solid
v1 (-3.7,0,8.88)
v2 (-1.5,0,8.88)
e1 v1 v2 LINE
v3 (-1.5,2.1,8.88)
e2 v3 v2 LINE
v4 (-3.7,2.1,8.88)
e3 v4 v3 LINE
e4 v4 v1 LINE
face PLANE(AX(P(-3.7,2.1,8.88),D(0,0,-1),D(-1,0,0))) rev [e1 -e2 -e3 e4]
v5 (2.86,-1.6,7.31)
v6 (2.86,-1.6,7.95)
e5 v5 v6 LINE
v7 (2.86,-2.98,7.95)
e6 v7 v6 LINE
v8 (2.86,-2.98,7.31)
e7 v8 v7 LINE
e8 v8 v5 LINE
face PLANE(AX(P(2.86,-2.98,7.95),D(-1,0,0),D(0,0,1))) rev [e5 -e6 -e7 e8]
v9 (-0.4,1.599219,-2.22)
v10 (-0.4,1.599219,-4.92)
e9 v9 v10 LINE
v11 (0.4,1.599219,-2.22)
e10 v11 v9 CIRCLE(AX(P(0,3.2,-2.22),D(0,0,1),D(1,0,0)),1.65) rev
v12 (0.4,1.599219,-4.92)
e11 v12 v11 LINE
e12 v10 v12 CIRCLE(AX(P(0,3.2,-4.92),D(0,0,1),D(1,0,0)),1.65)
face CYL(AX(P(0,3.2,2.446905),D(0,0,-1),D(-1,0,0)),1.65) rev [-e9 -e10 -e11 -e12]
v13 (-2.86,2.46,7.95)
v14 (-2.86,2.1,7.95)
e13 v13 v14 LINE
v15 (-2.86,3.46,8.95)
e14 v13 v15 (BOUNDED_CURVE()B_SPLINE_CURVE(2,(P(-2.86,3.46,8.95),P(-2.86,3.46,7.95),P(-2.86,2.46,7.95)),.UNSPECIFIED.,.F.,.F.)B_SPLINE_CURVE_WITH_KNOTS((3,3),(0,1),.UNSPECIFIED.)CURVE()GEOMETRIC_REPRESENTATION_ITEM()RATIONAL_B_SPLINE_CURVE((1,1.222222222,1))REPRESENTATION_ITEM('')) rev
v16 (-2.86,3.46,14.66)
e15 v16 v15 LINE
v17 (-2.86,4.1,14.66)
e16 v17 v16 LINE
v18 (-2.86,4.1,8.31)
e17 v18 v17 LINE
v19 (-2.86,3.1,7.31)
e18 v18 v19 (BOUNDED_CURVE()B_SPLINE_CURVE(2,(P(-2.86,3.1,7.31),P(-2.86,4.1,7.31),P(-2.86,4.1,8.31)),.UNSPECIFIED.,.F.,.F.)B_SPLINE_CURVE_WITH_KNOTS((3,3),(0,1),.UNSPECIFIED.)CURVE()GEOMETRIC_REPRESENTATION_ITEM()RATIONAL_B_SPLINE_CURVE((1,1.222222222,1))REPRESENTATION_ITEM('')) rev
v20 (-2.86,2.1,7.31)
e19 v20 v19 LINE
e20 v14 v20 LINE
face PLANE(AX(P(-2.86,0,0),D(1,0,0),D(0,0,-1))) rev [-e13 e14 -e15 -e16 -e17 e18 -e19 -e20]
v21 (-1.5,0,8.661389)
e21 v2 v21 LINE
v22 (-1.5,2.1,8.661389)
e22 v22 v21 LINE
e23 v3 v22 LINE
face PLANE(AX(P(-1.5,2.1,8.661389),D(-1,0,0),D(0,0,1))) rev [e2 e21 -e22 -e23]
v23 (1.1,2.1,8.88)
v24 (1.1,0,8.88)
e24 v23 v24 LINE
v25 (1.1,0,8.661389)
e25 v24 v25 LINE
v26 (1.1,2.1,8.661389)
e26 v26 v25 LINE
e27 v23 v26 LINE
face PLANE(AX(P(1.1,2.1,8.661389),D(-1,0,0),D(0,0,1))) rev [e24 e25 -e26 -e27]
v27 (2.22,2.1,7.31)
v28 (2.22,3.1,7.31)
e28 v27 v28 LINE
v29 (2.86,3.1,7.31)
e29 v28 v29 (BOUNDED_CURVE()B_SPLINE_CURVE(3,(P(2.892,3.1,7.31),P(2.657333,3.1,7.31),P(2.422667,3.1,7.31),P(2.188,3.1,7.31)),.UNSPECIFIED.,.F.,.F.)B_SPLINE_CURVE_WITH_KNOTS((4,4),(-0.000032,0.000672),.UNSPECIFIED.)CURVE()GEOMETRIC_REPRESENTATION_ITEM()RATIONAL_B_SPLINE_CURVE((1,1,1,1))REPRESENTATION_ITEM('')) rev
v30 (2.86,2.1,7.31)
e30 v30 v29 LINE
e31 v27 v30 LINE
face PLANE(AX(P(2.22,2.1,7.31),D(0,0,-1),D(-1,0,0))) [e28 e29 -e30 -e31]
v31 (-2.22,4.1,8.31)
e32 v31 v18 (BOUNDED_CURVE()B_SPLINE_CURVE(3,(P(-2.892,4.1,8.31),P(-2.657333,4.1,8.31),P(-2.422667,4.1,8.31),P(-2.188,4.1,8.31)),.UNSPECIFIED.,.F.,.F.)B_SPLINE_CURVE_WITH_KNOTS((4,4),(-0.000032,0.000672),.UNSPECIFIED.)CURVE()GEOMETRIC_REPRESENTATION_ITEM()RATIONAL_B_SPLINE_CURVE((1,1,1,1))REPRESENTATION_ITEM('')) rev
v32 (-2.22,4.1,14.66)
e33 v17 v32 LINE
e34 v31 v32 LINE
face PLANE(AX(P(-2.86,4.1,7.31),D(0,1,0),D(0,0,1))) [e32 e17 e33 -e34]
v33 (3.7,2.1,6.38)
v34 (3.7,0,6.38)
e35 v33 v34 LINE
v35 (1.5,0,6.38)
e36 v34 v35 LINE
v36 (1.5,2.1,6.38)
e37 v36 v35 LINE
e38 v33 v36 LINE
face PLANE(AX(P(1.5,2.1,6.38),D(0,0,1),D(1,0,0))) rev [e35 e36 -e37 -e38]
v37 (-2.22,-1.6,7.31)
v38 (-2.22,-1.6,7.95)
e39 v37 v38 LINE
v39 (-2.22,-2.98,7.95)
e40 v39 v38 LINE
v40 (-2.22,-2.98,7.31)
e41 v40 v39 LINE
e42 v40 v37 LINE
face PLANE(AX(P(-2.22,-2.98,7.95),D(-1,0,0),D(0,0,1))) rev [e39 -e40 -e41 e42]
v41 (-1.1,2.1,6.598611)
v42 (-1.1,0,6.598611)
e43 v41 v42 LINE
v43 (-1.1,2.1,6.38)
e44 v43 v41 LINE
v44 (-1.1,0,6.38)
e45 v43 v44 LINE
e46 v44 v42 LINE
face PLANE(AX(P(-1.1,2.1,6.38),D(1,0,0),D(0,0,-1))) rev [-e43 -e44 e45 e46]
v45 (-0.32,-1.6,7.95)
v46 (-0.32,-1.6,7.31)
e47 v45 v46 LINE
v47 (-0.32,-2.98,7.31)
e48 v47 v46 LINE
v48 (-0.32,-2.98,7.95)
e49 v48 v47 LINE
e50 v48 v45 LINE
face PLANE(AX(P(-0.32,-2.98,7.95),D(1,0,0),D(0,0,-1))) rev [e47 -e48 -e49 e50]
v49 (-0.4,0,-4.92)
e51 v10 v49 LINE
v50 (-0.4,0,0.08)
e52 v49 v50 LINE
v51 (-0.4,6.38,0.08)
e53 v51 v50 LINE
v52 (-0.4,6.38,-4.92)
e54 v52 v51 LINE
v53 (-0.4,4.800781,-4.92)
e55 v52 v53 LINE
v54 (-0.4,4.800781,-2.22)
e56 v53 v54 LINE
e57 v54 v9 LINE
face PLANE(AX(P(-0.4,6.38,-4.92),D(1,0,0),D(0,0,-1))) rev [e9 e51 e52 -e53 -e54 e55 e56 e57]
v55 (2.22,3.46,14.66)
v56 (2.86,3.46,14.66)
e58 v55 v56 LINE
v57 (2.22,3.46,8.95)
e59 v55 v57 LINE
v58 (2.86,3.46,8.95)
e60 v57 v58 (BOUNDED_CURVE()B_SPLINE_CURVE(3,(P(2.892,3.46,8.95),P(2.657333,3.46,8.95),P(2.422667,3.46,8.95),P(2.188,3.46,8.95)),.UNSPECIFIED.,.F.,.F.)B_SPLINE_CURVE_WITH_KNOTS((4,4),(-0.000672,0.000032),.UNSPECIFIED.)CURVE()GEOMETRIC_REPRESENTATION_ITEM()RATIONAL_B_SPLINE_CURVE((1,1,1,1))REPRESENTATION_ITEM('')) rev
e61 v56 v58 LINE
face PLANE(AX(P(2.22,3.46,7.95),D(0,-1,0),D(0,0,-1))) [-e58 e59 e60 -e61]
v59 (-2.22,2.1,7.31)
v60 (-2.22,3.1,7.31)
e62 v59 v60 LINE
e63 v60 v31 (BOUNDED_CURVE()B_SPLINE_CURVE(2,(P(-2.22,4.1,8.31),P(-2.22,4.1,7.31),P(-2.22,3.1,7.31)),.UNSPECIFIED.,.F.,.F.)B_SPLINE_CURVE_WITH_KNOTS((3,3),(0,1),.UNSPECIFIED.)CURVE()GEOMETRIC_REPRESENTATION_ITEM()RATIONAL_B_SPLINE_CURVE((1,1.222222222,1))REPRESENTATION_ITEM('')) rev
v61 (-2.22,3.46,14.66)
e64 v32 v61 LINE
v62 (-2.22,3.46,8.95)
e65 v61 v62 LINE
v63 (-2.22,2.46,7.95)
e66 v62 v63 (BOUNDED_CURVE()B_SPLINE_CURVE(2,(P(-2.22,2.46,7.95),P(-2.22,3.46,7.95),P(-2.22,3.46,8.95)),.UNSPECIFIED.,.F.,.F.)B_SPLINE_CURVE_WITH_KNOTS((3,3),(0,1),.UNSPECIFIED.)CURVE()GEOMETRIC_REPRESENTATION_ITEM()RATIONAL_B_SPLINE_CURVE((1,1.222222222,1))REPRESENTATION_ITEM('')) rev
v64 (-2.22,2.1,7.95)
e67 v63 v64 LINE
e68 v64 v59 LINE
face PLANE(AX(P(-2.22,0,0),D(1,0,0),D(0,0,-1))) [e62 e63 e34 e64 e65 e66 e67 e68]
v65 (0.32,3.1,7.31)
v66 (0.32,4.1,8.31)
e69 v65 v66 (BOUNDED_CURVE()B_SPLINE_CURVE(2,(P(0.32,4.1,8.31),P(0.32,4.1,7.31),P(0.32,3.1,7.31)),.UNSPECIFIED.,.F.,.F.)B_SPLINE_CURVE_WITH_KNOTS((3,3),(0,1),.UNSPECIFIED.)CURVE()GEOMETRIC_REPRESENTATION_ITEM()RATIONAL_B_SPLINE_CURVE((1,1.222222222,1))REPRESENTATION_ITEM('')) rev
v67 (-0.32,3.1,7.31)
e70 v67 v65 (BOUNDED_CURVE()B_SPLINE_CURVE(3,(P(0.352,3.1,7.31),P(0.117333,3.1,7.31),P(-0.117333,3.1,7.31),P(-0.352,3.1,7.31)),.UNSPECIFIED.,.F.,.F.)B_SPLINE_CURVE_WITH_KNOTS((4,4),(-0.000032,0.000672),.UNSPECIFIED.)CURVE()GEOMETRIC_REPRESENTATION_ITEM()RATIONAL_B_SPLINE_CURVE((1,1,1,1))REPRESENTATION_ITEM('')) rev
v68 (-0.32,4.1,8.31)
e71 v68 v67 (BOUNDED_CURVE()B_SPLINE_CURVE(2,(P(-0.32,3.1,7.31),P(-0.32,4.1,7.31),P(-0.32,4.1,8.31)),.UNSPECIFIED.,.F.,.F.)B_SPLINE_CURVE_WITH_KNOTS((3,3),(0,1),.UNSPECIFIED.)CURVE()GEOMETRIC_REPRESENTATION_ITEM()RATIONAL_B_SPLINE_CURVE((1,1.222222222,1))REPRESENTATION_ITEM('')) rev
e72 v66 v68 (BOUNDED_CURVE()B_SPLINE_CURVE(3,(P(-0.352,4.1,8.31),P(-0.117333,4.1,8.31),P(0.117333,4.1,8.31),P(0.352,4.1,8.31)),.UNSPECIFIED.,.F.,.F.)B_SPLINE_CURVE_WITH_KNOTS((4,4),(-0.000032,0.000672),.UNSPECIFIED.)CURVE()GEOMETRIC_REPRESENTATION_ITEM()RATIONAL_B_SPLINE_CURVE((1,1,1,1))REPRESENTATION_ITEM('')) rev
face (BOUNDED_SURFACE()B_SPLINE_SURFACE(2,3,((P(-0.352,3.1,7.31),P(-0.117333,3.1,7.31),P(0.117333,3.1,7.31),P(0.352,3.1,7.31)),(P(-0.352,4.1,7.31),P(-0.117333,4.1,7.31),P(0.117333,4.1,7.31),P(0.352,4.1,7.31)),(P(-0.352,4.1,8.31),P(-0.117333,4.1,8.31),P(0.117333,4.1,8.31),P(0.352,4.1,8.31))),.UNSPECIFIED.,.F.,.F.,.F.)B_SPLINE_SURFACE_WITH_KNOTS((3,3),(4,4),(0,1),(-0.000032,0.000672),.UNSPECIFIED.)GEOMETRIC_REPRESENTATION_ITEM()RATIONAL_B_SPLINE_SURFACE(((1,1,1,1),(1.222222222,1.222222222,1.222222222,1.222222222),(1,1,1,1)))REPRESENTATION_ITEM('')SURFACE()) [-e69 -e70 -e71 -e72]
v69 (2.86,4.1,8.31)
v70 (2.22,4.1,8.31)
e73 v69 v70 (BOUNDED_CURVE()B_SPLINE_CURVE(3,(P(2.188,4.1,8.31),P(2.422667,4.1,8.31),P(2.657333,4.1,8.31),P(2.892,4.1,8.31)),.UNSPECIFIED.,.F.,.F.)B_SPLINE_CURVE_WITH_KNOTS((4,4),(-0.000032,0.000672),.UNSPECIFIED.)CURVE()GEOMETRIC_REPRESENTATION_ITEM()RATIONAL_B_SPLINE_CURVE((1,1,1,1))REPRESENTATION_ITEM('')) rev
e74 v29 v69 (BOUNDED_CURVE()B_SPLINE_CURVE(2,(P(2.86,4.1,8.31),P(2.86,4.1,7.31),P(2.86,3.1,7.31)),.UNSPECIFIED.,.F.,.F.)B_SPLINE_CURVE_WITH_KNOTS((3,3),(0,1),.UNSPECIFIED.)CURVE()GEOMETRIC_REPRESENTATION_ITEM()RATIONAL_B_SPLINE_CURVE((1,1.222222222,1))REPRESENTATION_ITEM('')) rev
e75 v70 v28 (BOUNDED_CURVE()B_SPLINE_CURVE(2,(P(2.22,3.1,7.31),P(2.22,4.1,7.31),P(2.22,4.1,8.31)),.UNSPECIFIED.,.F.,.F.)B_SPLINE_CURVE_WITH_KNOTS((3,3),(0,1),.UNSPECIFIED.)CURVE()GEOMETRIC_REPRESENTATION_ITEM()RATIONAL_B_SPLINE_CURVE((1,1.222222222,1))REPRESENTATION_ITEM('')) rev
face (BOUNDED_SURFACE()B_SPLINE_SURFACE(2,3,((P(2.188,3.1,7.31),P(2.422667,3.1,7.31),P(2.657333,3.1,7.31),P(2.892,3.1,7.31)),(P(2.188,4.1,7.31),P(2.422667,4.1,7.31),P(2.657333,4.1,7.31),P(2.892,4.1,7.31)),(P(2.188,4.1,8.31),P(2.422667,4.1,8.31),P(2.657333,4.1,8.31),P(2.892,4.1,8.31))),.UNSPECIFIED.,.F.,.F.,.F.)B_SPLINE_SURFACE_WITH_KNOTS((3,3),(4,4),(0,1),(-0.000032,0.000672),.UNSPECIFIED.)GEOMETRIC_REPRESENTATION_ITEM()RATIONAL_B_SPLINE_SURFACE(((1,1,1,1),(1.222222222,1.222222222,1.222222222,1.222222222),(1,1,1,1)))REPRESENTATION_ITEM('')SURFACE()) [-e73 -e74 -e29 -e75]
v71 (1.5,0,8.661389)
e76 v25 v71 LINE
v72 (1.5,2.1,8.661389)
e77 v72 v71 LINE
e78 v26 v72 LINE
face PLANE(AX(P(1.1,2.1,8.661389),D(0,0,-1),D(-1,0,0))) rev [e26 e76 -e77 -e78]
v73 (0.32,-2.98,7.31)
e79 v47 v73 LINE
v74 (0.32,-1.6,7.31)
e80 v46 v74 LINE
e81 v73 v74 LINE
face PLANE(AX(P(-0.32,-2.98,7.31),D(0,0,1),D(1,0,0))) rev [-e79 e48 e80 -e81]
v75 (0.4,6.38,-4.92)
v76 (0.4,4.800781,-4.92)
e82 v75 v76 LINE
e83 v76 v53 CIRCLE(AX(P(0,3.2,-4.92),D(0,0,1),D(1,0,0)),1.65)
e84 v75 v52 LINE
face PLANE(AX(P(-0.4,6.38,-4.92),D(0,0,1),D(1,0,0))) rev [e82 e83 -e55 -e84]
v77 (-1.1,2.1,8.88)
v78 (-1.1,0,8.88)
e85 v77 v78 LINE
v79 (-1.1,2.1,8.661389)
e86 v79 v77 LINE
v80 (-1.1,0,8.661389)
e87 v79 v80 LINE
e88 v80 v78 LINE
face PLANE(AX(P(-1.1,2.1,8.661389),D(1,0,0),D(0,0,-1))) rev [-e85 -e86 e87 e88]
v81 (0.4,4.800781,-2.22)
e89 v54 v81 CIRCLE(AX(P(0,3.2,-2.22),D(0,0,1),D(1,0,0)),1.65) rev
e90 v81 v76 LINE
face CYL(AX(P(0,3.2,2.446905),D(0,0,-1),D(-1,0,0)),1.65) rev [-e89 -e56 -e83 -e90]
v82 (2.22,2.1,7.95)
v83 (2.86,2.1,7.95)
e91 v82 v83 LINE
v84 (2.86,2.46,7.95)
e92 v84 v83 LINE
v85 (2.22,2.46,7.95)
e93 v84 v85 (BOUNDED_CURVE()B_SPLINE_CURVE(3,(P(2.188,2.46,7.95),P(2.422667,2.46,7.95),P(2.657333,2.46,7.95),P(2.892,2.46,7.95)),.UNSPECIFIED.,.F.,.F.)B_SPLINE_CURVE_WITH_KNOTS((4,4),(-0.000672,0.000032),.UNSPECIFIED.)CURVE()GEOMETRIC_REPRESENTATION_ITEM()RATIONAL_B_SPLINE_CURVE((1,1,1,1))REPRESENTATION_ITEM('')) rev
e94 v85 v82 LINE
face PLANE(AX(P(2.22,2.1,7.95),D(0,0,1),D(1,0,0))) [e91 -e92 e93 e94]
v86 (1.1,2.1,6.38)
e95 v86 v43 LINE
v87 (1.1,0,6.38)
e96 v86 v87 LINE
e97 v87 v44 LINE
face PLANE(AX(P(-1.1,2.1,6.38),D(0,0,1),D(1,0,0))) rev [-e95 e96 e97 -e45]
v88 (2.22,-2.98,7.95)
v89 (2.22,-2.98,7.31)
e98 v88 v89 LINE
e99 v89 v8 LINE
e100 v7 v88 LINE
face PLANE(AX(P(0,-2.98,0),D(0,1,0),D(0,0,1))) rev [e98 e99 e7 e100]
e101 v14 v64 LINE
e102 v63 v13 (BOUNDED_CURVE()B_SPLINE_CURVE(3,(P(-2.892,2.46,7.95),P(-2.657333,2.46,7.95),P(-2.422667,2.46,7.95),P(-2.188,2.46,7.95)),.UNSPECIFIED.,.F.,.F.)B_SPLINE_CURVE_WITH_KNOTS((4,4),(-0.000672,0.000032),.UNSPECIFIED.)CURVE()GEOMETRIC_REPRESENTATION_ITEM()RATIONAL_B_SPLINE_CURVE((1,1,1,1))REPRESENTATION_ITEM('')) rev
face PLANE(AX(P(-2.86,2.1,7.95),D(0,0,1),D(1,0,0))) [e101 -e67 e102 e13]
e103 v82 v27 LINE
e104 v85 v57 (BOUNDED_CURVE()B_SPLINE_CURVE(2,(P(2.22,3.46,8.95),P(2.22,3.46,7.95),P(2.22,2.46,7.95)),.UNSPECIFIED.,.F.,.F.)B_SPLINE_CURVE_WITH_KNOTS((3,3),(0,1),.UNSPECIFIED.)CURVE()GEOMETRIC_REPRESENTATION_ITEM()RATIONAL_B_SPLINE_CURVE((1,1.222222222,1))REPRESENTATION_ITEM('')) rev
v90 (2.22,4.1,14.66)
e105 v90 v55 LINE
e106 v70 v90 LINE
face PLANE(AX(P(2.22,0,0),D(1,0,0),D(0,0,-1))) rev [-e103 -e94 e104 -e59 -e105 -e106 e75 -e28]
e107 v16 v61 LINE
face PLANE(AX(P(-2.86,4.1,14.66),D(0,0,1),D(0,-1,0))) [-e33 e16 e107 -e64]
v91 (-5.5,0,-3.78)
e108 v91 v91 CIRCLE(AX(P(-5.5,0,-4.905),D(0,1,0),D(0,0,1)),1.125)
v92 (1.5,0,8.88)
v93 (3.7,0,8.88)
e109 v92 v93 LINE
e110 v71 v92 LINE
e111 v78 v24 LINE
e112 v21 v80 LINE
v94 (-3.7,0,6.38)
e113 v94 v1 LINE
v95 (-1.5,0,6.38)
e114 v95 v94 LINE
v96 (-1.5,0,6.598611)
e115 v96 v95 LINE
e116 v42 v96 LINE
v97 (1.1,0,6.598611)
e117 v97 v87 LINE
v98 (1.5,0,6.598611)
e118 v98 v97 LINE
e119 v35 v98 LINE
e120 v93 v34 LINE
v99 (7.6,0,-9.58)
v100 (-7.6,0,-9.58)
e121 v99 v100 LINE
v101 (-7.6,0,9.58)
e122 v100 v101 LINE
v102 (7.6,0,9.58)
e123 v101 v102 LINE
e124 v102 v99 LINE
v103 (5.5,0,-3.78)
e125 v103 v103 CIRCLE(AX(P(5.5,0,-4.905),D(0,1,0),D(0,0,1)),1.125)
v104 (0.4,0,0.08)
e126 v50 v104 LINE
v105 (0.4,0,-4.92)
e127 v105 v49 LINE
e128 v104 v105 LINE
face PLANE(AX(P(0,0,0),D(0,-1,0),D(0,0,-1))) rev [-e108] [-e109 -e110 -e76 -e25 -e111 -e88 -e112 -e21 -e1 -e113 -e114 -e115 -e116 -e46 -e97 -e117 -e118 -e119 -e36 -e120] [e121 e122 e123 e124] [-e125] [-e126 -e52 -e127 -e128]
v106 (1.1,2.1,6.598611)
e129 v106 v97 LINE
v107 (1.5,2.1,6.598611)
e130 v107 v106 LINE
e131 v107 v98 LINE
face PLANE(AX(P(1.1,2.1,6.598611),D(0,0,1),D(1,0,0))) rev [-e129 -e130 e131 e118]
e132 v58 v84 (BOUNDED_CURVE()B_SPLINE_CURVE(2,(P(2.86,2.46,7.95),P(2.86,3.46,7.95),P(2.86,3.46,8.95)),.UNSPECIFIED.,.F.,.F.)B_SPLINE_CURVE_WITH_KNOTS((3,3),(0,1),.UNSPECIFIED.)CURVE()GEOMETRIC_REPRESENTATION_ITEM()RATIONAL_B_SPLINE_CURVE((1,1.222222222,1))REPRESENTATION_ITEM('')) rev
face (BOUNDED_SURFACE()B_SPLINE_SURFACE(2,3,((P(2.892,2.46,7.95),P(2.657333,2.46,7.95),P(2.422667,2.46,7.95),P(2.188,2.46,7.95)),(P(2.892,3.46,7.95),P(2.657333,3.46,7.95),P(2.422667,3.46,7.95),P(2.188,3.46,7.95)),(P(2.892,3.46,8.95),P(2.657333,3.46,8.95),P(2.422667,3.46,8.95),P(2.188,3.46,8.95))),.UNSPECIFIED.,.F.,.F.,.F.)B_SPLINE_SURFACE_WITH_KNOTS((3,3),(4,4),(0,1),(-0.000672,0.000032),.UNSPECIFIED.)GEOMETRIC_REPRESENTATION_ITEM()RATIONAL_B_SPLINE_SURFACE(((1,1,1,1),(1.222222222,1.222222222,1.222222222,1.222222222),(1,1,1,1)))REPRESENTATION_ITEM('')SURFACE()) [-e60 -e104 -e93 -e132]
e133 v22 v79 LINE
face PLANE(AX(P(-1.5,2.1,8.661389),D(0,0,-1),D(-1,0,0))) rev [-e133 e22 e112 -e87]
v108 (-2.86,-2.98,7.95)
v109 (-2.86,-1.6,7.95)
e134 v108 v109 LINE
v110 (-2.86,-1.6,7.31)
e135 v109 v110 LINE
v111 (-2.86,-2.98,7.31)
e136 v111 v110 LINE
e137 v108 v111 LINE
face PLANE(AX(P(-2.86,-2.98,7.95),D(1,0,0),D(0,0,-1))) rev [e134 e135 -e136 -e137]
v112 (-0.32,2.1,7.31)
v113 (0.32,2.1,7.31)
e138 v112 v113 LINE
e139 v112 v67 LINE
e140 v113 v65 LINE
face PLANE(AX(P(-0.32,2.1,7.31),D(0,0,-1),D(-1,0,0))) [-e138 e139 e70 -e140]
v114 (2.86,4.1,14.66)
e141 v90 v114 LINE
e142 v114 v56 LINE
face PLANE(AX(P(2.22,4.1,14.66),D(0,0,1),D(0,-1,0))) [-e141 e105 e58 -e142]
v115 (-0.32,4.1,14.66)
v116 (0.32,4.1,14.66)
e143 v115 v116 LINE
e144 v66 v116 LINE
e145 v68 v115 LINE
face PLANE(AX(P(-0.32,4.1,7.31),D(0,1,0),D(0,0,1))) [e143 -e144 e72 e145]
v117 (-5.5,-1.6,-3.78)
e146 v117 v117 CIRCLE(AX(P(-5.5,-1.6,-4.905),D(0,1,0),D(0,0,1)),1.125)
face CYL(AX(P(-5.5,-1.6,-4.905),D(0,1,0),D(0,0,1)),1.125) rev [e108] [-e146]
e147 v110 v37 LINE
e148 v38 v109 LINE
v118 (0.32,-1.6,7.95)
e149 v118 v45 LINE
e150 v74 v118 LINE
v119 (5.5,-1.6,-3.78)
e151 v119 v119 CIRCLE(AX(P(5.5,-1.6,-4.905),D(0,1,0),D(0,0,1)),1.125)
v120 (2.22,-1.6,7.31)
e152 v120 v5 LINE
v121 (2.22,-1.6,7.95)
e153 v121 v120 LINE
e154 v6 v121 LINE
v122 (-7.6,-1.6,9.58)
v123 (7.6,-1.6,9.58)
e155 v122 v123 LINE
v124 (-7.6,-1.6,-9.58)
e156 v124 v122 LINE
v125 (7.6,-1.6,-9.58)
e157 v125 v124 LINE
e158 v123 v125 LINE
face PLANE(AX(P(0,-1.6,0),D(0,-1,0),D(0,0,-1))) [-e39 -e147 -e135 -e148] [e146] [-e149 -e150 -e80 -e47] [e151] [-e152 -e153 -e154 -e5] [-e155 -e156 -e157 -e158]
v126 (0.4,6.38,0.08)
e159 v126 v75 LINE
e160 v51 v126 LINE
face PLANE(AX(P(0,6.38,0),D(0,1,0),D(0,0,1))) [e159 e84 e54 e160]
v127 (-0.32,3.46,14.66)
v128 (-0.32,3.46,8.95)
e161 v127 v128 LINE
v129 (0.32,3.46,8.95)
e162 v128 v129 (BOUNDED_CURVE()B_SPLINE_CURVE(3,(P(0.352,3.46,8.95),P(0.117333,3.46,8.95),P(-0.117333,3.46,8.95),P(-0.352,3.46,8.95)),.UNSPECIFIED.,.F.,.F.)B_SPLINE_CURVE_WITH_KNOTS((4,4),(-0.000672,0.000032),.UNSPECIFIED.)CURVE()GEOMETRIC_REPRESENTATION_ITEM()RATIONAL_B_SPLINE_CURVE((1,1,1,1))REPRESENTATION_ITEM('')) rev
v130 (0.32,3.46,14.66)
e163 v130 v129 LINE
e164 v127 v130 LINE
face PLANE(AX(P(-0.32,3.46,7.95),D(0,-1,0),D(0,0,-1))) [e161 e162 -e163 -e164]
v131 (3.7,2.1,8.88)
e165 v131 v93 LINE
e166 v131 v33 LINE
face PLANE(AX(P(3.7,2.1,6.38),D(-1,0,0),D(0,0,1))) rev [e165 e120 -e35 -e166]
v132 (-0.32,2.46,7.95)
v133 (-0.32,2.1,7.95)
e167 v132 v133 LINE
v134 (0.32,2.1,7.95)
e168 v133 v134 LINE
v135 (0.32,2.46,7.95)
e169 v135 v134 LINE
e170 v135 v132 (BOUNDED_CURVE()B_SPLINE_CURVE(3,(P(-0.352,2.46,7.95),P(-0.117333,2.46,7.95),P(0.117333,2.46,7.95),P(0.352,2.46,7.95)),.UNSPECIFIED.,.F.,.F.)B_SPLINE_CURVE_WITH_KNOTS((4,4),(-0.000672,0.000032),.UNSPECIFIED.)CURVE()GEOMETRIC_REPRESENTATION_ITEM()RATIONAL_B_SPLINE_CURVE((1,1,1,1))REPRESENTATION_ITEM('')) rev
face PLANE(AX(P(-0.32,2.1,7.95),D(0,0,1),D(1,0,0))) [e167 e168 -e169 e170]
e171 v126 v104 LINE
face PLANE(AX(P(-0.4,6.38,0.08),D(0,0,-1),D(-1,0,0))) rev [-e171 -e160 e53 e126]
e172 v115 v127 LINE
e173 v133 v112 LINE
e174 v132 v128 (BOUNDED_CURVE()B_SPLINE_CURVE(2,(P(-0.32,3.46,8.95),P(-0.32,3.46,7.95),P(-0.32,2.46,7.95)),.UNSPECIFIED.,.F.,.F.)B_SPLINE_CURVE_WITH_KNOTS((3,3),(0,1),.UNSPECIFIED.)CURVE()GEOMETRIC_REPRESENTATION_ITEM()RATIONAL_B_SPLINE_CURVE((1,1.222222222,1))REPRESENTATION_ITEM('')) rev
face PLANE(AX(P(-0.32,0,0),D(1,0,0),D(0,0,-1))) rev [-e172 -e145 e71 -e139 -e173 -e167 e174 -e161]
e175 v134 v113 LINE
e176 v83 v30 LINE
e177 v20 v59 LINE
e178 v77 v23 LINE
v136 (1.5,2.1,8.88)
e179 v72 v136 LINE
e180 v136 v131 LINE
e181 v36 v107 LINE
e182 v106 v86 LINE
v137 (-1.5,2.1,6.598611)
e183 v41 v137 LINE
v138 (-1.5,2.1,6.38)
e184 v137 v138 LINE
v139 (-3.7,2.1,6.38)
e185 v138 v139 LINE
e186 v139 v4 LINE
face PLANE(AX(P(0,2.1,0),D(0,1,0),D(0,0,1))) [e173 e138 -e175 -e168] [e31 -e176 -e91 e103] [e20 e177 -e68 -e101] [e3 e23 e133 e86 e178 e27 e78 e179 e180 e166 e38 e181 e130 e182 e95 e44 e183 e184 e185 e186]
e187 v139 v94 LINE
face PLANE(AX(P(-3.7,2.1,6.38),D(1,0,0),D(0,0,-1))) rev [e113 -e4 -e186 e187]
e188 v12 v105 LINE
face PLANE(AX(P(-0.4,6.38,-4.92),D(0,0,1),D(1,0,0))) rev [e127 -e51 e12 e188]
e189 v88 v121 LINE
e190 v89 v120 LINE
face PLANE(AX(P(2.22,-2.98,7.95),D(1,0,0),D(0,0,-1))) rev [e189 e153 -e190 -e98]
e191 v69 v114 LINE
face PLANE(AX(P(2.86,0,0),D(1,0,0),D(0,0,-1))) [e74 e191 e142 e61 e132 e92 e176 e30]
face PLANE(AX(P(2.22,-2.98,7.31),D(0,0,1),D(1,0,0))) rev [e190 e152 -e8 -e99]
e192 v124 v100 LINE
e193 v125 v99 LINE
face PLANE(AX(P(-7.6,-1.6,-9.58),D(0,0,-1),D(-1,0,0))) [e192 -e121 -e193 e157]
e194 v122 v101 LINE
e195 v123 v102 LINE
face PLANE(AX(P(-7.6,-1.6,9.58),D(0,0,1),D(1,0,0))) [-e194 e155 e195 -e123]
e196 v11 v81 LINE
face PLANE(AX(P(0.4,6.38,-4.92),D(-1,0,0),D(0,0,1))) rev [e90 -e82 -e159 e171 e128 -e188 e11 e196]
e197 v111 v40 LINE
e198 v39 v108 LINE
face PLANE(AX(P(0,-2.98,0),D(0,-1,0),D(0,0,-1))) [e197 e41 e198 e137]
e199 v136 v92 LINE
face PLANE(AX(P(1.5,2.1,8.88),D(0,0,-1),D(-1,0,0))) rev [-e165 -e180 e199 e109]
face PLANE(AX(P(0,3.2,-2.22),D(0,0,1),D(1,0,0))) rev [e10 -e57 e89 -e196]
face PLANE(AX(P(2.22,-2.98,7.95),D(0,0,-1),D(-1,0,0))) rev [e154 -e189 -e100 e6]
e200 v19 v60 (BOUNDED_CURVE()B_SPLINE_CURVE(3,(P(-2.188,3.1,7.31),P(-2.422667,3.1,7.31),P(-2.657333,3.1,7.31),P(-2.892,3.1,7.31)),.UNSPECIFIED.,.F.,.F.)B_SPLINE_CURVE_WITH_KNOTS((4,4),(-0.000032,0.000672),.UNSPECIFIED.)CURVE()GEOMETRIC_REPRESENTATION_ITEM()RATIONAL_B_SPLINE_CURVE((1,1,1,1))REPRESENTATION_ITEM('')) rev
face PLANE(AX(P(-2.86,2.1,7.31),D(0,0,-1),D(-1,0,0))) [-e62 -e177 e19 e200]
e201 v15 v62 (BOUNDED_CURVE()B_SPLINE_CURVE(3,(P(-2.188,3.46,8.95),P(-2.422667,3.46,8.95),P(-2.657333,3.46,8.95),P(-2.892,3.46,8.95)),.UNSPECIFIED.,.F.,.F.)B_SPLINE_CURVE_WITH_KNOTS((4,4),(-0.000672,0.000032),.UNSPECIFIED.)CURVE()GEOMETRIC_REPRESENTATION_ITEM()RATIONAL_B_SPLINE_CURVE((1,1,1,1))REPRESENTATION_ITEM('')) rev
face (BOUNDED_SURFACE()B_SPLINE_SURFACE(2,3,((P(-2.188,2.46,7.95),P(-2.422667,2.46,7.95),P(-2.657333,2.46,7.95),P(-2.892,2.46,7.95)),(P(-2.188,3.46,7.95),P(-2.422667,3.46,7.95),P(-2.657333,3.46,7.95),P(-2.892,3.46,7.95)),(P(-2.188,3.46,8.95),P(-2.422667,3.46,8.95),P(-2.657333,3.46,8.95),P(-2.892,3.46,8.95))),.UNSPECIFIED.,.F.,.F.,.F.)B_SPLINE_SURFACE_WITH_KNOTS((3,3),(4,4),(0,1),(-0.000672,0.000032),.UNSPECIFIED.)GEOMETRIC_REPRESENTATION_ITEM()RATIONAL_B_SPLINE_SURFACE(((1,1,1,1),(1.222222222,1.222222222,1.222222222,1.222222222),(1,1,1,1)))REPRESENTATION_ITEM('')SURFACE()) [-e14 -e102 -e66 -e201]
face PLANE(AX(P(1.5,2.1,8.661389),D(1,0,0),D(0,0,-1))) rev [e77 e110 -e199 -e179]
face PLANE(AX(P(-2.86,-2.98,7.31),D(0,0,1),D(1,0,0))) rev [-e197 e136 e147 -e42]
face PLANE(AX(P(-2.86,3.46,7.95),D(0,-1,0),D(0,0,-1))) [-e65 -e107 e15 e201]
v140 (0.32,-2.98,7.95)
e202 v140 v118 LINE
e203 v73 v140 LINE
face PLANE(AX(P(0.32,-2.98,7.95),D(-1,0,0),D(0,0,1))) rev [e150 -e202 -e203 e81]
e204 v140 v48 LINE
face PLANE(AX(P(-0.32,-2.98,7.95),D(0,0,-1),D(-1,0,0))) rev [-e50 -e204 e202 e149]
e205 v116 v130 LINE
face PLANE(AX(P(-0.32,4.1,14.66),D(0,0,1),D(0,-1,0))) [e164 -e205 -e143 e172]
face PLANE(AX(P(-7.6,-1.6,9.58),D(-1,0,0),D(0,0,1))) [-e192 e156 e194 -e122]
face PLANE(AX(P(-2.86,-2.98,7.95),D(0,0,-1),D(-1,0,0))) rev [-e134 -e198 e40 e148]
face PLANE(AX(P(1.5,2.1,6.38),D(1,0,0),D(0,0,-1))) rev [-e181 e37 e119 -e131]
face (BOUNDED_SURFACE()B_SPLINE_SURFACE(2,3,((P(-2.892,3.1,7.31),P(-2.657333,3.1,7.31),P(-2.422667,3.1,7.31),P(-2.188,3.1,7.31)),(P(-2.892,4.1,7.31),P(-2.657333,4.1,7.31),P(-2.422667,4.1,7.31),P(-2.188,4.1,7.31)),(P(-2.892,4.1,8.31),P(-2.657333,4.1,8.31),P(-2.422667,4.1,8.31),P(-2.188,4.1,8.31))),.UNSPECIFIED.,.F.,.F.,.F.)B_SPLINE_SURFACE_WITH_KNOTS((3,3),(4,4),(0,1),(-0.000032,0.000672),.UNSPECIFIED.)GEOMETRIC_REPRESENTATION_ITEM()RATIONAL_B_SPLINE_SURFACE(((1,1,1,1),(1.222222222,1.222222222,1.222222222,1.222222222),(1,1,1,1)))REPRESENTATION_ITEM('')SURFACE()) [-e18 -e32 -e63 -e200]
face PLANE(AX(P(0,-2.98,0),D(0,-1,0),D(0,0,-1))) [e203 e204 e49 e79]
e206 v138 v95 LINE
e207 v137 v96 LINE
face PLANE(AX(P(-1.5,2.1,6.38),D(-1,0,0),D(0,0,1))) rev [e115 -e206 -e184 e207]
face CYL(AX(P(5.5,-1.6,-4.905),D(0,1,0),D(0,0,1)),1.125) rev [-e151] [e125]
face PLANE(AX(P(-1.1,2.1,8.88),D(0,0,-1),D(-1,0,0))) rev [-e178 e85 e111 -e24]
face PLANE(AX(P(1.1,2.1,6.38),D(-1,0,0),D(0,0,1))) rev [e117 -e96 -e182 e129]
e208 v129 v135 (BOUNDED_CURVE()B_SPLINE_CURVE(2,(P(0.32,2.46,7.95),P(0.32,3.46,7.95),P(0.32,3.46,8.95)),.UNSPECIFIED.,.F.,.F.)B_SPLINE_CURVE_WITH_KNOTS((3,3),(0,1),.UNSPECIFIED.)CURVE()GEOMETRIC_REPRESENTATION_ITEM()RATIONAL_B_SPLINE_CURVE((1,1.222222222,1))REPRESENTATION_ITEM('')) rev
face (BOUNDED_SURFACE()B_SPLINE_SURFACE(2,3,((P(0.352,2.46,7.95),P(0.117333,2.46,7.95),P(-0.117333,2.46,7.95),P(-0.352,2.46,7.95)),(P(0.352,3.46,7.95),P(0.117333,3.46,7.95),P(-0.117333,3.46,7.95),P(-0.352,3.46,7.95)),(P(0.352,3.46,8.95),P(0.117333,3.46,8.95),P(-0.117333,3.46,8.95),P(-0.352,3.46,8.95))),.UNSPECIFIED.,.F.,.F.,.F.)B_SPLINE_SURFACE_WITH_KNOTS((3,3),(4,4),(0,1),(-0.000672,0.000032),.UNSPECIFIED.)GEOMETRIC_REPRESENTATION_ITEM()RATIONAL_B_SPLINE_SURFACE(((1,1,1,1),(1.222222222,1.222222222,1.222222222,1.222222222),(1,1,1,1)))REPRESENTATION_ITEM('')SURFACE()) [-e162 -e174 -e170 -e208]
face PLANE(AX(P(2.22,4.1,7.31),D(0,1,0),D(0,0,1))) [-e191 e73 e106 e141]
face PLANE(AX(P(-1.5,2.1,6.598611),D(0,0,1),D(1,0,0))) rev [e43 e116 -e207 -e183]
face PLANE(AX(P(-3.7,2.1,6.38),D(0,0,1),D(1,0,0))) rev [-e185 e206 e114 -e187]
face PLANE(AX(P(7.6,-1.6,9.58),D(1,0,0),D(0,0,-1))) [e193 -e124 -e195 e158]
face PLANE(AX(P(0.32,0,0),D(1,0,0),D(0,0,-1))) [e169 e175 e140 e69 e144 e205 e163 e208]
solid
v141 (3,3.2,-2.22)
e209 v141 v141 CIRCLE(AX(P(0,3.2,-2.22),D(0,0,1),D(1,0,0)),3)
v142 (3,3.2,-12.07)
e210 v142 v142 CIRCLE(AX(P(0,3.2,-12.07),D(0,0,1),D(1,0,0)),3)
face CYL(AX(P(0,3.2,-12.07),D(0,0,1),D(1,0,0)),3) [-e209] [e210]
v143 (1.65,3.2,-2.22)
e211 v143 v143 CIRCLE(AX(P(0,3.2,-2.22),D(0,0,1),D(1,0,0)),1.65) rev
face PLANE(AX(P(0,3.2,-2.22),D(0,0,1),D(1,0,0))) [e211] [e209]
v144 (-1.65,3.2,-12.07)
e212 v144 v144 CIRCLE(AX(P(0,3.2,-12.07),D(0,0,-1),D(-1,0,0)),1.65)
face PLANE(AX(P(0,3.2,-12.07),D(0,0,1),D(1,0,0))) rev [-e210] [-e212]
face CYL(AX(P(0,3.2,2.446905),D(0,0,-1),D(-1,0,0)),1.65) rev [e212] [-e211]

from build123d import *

# Parameters (mm, degrees)
SKETCH1_W                     = 15.2
SKETCH1_H                     = 19.16
BOSS_EXTRUDE1_DEPTH           = 1.6
SKETCH2_R                     = 1.125
CUT_EXTRUDE1_DEPTH            = 13.332736923
BOSS_EXTRUDE2_DEPTH           = 2.1
BOSS_EXTRUDE3_DEPTH           = 0.32
FILLET1_SIZE                  = 1
LPATTERN1_COUNT               = 2
LPATTERN1_PITCH               = 2.54
FILLET1_OF_LPATTERN1_SIZE     = 1
LPATTERN1_COL_COUNT           = 2
LPATTERN1_COL_PITCH           = 2.54
FILLET1_OF_LPATTERN1_COL_SIZE = 1
SKETCH5_W                     = 0.8
SKETCH5_H                     = 5
BOSS_EXTRUDE4_DEPTH           = 6.38
SKETCH6_R                     = 3
BOSS_EXTRUDE7_DEPTH           = 9.85
SKETCH8_R                     = 1.65
CUT_EXTRUDE2_DEPTH            = 9.85
SKETCH9_W                     = 0.64
SKETCH9_H                     = 0.64
BOSS_EXTRUDE11_DEPTH          = 1.38


with BuildPart() as part:
    # Sketch1 → Boss-Extrude1 (new body)
    with BuildSketch(Plane(origin=(0, 0, 0), x_dir=(1, 0, 0), z_dir=(0, 1, 0))):
        Rectangle(SKETCH1_W, SKETCH1_H)
    extrude(amount=-BOSS_EXTRUDE1_DEPTH)

    # Sketch2 → Cut-Extrude1 (cut, through all)
    with BuildSketch(Plane(origin=(0, 0, 0), x_dir=(1, 0, 0), z_dir=(0, 1, 0))):
        with Locations(Location((-5.5, 4.905, 0), (0, 0, 270))):
            Circle(SKETCH2_R)
        with Locations(Location((5.5, 4.905, 0), (0, 0, 270))):
            Circle(SKETCH2_R)
    extrude(amount=-CUT_EXTRUDE1_DEPTH, mode=Mode.SUBTRACT)

    # Sketch3 → Boss-Extrude2 (add)
    with BuildSketch(Plane(origin=(0, 0, 0), x_dir=(1, 0, 0), z_dir=(0, 1, 0))):
        Polygon((-3.7, -6.38), (-1.5, -6.38), (-1.5, -6.598611303), (-1.1, -6.598611303), (-1.1, -6.38), (1.1, -6.38), (1.1, -6.598611303), (1.5, -6.598611303), (1.5, -6.38), (3.7, -6.38), (3.7, -8.88), (1.5, -8.88), (1.5, -8.661388697), (1.1, -8.661388697), (1.1, -8.88), (-1.1, -8.88), (-1.1, -8.661388697), (-1.5, -8.661388697), (-1.5, -8.88), (-3.7, -8.88), align=None)
    extrude(amount=BOSS_EXTRUDE2_DEPTH)

    # Sketch4 → Boss-Extrude3 (add, symmetric)
    with BuildSketch(Plane(origin=(0, 0, 0), x_dir=(0, 0, -1), z_dir=(1, 0, 0))):
        Polygon((-7.95, 2.1), (-7.31, 2.1), (-7.31, 4.1), (-14.66, 4.1), (-14.66, 3.46), (-7.95, 3.46), align=None)
    boss_extrude3 = extrude(amount=BOSS_EXTRUDE3_DEPTH, both=True)

    # Fillet1
    # a fillet whose section is not a circle: 1 mm, written as the material it adds along each edge
    with BuildSketch(Plane(origin=(0.32, 3.46, 7.95), x_dir=(0, -1, 0), z_dir=(-1, 0, 0))) as fillet1_piece_1:
        with BuildLine():
            Bezier((FILLET1_SIZE, 0), (0, 0), (0, FILLET1_SIZE), weights=[1, 1.222222222, 1])
            Line((0, FILLET1_SIZE), (0, 0))
            Line((0, 0), (FILLET1_SIZE, 0))
        make_face()
    extrude(amount=0.64)
    # a fillet whose section is not a circle: 1 mm, written as the material it takes off along each edge
    with BuildSketch(Plane(origin=(-2.82, 4.1, 7.31), x_dir=(0, -1, 0), z_dir=(1, 0, 0))) as fillet1_2_piece_1:
        with BuildLine():
            Bezier((FILLET1_SIZE, 0), (0, 0), (0, -FILLET1_SIZE), weights=[1, 1.222222222, 1])
            Line((0, -FILLET1_SIZE), (0, 0))
            Line((0, 0), (FILLET1_SIZE, 0))
        make_face()
    extrude(amount=5.64, mode=Mode.SUBTRACT)

    # LPattern1: Boss-Extrude3 ×2
    with Locations(*[(i * LPATTERN1_PITCH, 0, 0) for i in range(1, LPATTERN1_COUNT)]):
        add(boss_extrude3)

    # Fillet1 of LPattern1
    # a fillet whose section is not a circle: 1 mm, written as the material it adds along each edge
    with BuildSketch(Plane(origin=(2.86, 3.46, 7.95), x_dir=(0, -1, 0), z_dir=(-1, 0, 0))) as fillet1_of_lpattern1_piece_1:
        with BuildLine():
            Bezier((FILLET1_OF_LPATTERN1_SIZE, 0), (0, 0), (0, FILLET1_OF_LPATTERN1_SIZE), weights=[1, 1.222222222, 1])
            Line((0, FILLET1_OF_LPATTERN1_SIZE), (0, 0))
            Line((0, 0), (FILLET1_OF_LPATTERN1_SIZE, 0))
        make_face()
    extrude(amount=0.64)
    with BuildSketch(Plane(origin=(2.86, 3.46, 7.95), x_dir=(0, -1, 0), z_dir=(-1, 0, 0))) as fillet1_of_lpattern1_piece_2_section:
        with BuildLine():
            Bezier((FILLET1_OF_LPATTERN1_SIZE, 0), (0, 0), (0, FILLET1_OF_LPATTERN1_SIZE), weights=[1, 1.222222222, 1])
            Line((0, FILLET1_OF_LPATTERN1_SIZE), (0, 0))
            Line((0, 0), (FILLET1_OF_LPATTERN1_SIZE, 0))
        make_face()
    fillet1_of_lpattern1_piece_2 = extrude(amount=3.14, mode=Mode.PRIVATE)
    fillet1_of_lpattern1_piece_2 = split(fillet1_of_lpattern1_piece_2, bisect_by=Plane(origin=(0.32, 3.46, 7.95), z_dir=(-1, 0, 0)), keep=Keep.TOP, mode=Mode.PRIVATE)
    add(fillet1_of_lpattern1_piece_2)
    # a fillet whose section is not a circle: 1 mm, written as the material it takes off along each edge
    with BuildSketch(Plane(origin=(-0.28, 4.1, 7.31), x_dir=(0, -1, 0), z_dir=(1, 0, 0))) as fillet1_of_lpattern1_2_piece_1:
        with BuildLine():
            Bezier((FILLET1_OF_LPATTERN1_SIZE, 0), (0, 0), (0, -FILLET1_OF_LPATTERN1_SIZE), weights=[1, 1.222222222, 1])
            Line((0, -FILLET1_OF_LPATTERN1_SIZE), (0, 0))
            Line((0, 0), (FILLET1_OF_LPATTERN1_SIZE, 0))
        make_face()
    extrude(amount=5.64, mode=Mode.SUBTRACT)

    # LPattern1 col: Boss-Extrude3 ×2
    with Locations(*[(-i * LPATTERN1_COL_PITCH, 0, 0) for i in range(1, LPATTERN1_COL_COUNT)]):
        add(boss_extrude3)

    # Fillet1 of LPattern1 col
    # a fillet whose section is not a circle: 1 mm, written as the material it adds along each edge
    with BuildSketch(Plane(origin=(0.28, 3.46, 7.95), x_dir=(0, -1, 0), z_dir=(-1, 0, 0))) as fillet1_of_lpattern1_col_piece_1_section:
        with BuildLine():
            Bezier((FILLET1_OF_LPATTERN1_COL_SIZE, 0), (0, 0), (0, FILLET1_OF_LPATTERN1_COL_SIZE), weights=[1, 1.222222222, 1])
            Line((0, FILLET1_OF_LPATTERN1_COL_SIZE), (0, 0))
            Line((0, 0), (FILLET1_OF_LPATTERN1_COL_SIZE, 0))
        make_face()
    fillet1_of_lpattern1_col_piece_1 = extrude(amount=3.14, mode=Mode.PRIVATE)
    fillet1_of_lpattern1_col_piece_1 = split(fillet1_of_lpattern1_col_piece_1, bisect_by=Plane(origin=(-0.32, 3.46, 7.95), z_dir=(1, 0, 0)), keep=Keep.TOP, mode=Mode.PRIVATE)
    add(fillet1_of_lpattern1_col_piece_1)
    with BuildSketch(Plane(origin=(-2.22, 3.46, 7.95), x_dir=(0, -1, 0), z_dir=(-1, 0, 0))) as fillet1_of_lpattern1_col_piece_2:
        with BuildLine():
            Bezier((FILLET1_OF_LPATTERN1_COL_SIZE, 0), (0, 0), (0, FILLET1_OF_LPATTERN1_COL_SIZE), weights=[1, 1.222222222, 1])
            Line((0, FILLET1_OF_LPATTERN1_COL_SIZE), (0, 0))
            Line((0, 0), (FILLET1_OF_LPATTERN1_COL_SIZE, 0))
        make_face()
    extrude(amount=0.64)
    # a fillet whose section is not a circle: 1 mm, written as the material it takes off along each edge
    with BuildSketch(Plane(origin=(-5.36, 4.1, 7.31), x_dir=(0, -1, 0), z_dir=(1, 0, 0))) as fillet1_of_lpattern1_col_2_piece_1:
        with BuildLine():
            Bezier((FILLET1_OF_LPATTERN1_COL_SIZE, 0), (0, 0), (0, -FILLET1_OF_LPATTERN1_COL_SIZE), weights=[1, 1.222222222, 1])
            Line((0, -FILLET1_OF_LPATTERN1_COL_SIZE), (0, 0))
            Line((0, 0), (FILLET1_OF_LPATTERN1_COL_SIZE, 0))
        make_face()
    extrude(amount=5.64, mode=Mode.SUBTRACT)

    # Sketch5 → Boss-Extrude4 (add)
    with BuildSketch(Plane(origin=(0, 0, 0), x_dir=(1, 0, 0), z_dir=(0, 1, 0))):
        with Locations((0, 2.42)):
            Rectangle(SKETCH5_W, SKETCH5_H)
    extrude(amount=BOSS_EXTRUDE4_DEPTH)


with BuildPart() as body_2:
    # Sketch6 → Boss-Extrude7 (new body)
    with BuildSketch(Plane.XY.offset(-2.22)):
        with Locations((0, 3.2)):
            Circle(SKETCH6_R)
    extrude(amount=-BOSS_EXTRUDE7_DEPTH)


with BuildPart() as cut_extrude2_tool:
    # Sketch8 → Cut-Extrude2 (new body)
    with BuildSketch(Plane(origin=(0, 0, -12.07), x_dir=(-1, 0, 0), z_dir=(0, 0, -1))):
        with Locations((0, 3.2)):
            Circle(SKETCH8_R)
    extrude(amount=-CUT_EXTRUDE2_DEPTH)


with BuildPart() as part_1:
    add(part.part)

    # Cut-Extrude2: cut by cut_extrude2_tool
    add(cut_extrude2_tool.part, mode=Mode.SUBTRACT)

    # Sketch9 → Boss-Extrude11 (add)
    with BuildSketch(Plane.XZ.offset(1.6)):
        with Locations((2.54, 7.63)):
            Rectangle(SKETCH9_W, SKETCH9_H)
        with Locations((0, 7.63)):
            Rectangle(SKETCH9_W, SKETCH9_H)
        with Locations((-2.54, 7.63)):
            Rectangle(SKETCH9_W, SKETCH9_H)
    extrude(amount=BOSS_EXTRUDE11_DEPTH)


with BuildPart() as body_2_1:
    add(body_2.part)

    # Cut-Extrude2: cut by cut_extrude2_tool
    add(cut_extrude2_tool.part, mode=Mode.SUBTRACT)


solid = Compound([part_1.part, body_2_1.part])
